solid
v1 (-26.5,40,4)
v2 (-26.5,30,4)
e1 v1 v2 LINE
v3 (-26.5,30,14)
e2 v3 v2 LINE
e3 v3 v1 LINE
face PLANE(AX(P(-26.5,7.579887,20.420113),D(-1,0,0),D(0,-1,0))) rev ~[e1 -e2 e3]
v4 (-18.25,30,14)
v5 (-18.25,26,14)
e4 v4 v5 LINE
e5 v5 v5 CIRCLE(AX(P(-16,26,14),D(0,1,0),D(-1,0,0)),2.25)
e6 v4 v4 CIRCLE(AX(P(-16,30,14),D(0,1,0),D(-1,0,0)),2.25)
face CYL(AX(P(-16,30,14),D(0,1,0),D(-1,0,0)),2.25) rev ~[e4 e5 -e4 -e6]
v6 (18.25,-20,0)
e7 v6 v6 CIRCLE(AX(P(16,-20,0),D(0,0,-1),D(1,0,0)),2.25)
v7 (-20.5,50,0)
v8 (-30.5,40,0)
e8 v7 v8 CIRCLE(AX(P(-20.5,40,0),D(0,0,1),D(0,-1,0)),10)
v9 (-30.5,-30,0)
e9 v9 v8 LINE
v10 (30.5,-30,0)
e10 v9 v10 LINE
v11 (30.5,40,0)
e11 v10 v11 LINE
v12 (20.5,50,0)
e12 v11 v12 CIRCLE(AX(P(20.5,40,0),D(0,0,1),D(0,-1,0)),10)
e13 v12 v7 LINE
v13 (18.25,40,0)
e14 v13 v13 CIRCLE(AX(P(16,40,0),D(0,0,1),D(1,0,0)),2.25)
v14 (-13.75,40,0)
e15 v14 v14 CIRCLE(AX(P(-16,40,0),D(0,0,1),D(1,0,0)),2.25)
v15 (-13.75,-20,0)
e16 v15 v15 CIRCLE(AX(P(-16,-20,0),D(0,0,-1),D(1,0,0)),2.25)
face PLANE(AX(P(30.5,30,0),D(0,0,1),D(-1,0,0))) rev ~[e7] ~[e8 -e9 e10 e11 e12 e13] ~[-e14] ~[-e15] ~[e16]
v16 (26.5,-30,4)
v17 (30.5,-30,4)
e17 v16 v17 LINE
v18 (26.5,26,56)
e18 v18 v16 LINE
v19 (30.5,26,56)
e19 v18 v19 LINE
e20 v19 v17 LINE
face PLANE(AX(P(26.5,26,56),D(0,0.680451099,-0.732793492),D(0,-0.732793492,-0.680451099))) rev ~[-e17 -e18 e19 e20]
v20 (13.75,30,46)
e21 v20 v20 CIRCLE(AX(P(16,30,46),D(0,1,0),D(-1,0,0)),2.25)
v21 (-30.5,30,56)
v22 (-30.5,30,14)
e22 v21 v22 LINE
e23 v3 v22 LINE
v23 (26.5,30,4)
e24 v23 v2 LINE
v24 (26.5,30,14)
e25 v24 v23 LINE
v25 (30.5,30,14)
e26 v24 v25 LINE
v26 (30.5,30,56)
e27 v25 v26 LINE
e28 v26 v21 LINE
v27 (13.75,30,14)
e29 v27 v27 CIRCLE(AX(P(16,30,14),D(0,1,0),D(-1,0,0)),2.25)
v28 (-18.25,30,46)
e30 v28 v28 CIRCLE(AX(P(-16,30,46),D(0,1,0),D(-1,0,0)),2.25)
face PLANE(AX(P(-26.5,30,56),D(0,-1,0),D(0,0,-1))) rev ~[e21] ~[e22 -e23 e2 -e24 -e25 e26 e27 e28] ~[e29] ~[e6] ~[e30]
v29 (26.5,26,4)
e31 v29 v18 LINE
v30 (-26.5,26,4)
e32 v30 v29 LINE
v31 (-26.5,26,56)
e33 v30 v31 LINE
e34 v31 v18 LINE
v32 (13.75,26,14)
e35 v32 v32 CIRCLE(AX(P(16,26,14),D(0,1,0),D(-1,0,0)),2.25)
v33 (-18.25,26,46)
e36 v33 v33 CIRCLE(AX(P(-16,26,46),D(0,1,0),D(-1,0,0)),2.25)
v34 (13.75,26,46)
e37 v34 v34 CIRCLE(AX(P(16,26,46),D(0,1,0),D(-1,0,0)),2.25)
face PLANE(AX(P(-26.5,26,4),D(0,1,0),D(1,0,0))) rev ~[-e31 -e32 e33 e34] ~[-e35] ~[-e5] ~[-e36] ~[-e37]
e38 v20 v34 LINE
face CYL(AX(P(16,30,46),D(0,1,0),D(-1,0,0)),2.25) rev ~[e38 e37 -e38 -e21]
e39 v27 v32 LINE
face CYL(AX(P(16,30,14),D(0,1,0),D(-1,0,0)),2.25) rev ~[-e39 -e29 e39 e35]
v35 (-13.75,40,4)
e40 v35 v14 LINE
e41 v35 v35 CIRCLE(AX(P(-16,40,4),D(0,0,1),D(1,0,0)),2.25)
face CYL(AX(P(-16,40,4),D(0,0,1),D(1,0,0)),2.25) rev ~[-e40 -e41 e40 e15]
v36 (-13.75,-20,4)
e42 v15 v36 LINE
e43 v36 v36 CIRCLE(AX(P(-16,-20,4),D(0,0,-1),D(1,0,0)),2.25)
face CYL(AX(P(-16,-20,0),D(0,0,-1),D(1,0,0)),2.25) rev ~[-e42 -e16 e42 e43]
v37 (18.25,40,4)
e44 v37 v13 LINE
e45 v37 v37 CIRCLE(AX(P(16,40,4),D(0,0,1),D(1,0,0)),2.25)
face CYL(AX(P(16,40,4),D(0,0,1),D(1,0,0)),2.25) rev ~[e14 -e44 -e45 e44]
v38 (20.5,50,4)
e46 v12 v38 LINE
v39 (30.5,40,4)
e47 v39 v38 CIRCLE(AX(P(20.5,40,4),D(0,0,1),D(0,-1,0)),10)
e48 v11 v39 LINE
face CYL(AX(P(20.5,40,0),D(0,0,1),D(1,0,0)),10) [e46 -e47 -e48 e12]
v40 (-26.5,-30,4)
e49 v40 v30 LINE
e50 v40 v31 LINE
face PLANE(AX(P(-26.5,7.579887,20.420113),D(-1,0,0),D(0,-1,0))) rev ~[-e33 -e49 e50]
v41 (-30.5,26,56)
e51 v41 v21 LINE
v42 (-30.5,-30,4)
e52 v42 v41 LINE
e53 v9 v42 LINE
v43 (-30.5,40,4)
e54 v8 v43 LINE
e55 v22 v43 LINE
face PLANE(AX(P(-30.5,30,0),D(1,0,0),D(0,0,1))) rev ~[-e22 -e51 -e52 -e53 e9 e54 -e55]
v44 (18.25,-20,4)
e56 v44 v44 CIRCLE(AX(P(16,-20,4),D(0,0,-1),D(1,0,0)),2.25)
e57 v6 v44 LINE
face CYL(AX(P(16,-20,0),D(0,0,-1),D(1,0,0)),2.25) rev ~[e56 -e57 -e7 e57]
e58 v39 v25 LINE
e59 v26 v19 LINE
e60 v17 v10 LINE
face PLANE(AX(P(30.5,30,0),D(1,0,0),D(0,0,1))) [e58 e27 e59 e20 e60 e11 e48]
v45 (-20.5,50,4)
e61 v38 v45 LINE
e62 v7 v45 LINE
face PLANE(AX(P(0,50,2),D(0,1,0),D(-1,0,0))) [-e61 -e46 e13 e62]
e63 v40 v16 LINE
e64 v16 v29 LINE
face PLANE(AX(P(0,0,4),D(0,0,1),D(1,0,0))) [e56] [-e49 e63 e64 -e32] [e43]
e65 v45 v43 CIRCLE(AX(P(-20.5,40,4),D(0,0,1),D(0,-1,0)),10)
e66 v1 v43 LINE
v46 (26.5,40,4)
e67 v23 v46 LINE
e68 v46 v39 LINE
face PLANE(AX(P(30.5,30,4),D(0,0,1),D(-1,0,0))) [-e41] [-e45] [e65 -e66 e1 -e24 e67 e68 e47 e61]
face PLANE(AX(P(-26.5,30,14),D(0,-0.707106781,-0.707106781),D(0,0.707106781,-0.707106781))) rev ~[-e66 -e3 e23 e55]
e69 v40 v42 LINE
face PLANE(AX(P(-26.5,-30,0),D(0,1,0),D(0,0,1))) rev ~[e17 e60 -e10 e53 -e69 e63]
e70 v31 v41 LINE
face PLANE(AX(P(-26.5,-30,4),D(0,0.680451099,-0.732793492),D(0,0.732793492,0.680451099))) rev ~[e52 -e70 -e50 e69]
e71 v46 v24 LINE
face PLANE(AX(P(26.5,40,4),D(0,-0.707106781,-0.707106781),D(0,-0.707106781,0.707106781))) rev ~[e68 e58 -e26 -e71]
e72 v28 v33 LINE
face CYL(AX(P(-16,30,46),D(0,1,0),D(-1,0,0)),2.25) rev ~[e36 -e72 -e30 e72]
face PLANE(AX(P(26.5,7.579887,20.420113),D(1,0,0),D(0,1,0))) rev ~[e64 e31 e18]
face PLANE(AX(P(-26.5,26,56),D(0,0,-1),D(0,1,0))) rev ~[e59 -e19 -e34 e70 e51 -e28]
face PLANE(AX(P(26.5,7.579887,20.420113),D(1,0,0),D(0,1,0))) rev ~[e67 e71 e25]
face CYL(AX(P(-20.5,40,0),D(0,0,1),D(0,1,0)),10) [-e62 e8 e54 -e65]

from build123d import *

# Parameters (mm, degrees)
F0_W      = 53
F0_H      = 60
F1_DEPTH  = 4
F2_W      = 53
F2_H      = 4
F3_DEPTH  = 52
F4_R      = 2.25
F5_DEPTH  = 56.001
F6_R      = 2.25
F7_DEPTH  = 60.001
F9_DEPTH  = 4
F11_DEPTH = 4
F12_W     = 61
F12_H     = 4
F13_DEPTH = 20
F14_R     = 2.25
F15_DEPTH = 4.001
F16_R     = 10


# Not quite as in the source:
# - a feature names something its author has since deleted; it is built from what else it names


with BuildPart() as f1:
    # F0 (on Top) → F1 (new body)
    with BuildSketch(Plane.XY):
        Rectangle(F0_W, F0_H)
    extrude(amount=F1_DEPTH)

    # F2 (on face) → F3 (join)
    with BuildSketch(Plane.XY.offset(4)):
        with Locations((0, 28)):
            Rectangle(F2_W, F2_H)
    extrude(amount=F3_DEPTH)

    # F4 (on face) → F5 (cut, through all)
    with BuildSketch(Plane(origin=(0, 0, 0), x_dir=(1, 0, 0), z_dir=(0, 0, -1))):
        with Locations((-16, 20)):
            Circle(F4_R)
        with Locations((16, 20)):
            Circle(F4_R)
    extrude(amount=-F5_DEPTH, mode=Mode.SUBTRACT)

    # F6 (on face) → F7 (cut, through all)
    with BuildSketch(Plane(origin=(0, 30, 0), x_dir=(-1, 0, 0), z_dir=(0, 1, 0))):
        with Locations((-16, 14)):
            Circle(F6_R)
        with Locations((-16, 46)):
            Circle(F6_R)
        with Locations((16, 14)):
            Circle(F6_R)
        with Locations((16, 46)):
            Circle(F6_R)
    extrude(amount=-F7_DEPTH, mode=Mode.SUBTRACT)

    # F8 (on face) → F9 (join)
    with BuildSketch(Plane.YZ.offset(26.5)):
        Polygon((30, 14), (30, 56), (26, 56), (-30, 4), (-30, 0), (30, 0), (30, 4), align=None)
        Polygon((40, 4), (30, 14), (30, 4), align=None)
    extrude(amount=F9_DEPTH)

    # F10 (on face) → F11 (join)
    with BuildSketch(Plane(origin=(-26.5, 0, 0), x_dir=(0, -1, 0), z_dir=(-1, 0, 0))):
        Polygon((-26, 56), (-30, 56), (-30, 14), (-30, 4), (-30, 0), (30, 0), (30, 4), align=None)
        Polygon((-30, 4), (-30, 14), (-40, 4), align=None)
    extrude(amount=F11_DEPTH)

    # F12 (on face) → F13 (join)
    with BuildSketch(Plane(origin=(0, 30, 0), x_dir=(-1, 0, 0), z_dir=(0, 1, 0))):
        with Locations((0, 2)):
            Rectangle(F12_W, F12_H)
    extrude(amount=F13_DEPTH)

    # F14 (on face) → F15 (cut, through all)
    with BuildSketch(Plane.XY.offset(4)):
        with Locations((16, 40)):
            Circle(F14_R)
        with Locations((-16, 40)):
            Circle(F14_R)
    extrude(amount=-F15_DEPTH, mode=Mode.SUBTRACT)

    # F16
    f16_edges = [f1.edges().sort_by_distance(p)[0] for p in [
        (30.5, 50, 2),
        (-30.5, 50, 2),
    ]]
    fillet(f16_edges, radius=F16_R)


solid = f1.part
